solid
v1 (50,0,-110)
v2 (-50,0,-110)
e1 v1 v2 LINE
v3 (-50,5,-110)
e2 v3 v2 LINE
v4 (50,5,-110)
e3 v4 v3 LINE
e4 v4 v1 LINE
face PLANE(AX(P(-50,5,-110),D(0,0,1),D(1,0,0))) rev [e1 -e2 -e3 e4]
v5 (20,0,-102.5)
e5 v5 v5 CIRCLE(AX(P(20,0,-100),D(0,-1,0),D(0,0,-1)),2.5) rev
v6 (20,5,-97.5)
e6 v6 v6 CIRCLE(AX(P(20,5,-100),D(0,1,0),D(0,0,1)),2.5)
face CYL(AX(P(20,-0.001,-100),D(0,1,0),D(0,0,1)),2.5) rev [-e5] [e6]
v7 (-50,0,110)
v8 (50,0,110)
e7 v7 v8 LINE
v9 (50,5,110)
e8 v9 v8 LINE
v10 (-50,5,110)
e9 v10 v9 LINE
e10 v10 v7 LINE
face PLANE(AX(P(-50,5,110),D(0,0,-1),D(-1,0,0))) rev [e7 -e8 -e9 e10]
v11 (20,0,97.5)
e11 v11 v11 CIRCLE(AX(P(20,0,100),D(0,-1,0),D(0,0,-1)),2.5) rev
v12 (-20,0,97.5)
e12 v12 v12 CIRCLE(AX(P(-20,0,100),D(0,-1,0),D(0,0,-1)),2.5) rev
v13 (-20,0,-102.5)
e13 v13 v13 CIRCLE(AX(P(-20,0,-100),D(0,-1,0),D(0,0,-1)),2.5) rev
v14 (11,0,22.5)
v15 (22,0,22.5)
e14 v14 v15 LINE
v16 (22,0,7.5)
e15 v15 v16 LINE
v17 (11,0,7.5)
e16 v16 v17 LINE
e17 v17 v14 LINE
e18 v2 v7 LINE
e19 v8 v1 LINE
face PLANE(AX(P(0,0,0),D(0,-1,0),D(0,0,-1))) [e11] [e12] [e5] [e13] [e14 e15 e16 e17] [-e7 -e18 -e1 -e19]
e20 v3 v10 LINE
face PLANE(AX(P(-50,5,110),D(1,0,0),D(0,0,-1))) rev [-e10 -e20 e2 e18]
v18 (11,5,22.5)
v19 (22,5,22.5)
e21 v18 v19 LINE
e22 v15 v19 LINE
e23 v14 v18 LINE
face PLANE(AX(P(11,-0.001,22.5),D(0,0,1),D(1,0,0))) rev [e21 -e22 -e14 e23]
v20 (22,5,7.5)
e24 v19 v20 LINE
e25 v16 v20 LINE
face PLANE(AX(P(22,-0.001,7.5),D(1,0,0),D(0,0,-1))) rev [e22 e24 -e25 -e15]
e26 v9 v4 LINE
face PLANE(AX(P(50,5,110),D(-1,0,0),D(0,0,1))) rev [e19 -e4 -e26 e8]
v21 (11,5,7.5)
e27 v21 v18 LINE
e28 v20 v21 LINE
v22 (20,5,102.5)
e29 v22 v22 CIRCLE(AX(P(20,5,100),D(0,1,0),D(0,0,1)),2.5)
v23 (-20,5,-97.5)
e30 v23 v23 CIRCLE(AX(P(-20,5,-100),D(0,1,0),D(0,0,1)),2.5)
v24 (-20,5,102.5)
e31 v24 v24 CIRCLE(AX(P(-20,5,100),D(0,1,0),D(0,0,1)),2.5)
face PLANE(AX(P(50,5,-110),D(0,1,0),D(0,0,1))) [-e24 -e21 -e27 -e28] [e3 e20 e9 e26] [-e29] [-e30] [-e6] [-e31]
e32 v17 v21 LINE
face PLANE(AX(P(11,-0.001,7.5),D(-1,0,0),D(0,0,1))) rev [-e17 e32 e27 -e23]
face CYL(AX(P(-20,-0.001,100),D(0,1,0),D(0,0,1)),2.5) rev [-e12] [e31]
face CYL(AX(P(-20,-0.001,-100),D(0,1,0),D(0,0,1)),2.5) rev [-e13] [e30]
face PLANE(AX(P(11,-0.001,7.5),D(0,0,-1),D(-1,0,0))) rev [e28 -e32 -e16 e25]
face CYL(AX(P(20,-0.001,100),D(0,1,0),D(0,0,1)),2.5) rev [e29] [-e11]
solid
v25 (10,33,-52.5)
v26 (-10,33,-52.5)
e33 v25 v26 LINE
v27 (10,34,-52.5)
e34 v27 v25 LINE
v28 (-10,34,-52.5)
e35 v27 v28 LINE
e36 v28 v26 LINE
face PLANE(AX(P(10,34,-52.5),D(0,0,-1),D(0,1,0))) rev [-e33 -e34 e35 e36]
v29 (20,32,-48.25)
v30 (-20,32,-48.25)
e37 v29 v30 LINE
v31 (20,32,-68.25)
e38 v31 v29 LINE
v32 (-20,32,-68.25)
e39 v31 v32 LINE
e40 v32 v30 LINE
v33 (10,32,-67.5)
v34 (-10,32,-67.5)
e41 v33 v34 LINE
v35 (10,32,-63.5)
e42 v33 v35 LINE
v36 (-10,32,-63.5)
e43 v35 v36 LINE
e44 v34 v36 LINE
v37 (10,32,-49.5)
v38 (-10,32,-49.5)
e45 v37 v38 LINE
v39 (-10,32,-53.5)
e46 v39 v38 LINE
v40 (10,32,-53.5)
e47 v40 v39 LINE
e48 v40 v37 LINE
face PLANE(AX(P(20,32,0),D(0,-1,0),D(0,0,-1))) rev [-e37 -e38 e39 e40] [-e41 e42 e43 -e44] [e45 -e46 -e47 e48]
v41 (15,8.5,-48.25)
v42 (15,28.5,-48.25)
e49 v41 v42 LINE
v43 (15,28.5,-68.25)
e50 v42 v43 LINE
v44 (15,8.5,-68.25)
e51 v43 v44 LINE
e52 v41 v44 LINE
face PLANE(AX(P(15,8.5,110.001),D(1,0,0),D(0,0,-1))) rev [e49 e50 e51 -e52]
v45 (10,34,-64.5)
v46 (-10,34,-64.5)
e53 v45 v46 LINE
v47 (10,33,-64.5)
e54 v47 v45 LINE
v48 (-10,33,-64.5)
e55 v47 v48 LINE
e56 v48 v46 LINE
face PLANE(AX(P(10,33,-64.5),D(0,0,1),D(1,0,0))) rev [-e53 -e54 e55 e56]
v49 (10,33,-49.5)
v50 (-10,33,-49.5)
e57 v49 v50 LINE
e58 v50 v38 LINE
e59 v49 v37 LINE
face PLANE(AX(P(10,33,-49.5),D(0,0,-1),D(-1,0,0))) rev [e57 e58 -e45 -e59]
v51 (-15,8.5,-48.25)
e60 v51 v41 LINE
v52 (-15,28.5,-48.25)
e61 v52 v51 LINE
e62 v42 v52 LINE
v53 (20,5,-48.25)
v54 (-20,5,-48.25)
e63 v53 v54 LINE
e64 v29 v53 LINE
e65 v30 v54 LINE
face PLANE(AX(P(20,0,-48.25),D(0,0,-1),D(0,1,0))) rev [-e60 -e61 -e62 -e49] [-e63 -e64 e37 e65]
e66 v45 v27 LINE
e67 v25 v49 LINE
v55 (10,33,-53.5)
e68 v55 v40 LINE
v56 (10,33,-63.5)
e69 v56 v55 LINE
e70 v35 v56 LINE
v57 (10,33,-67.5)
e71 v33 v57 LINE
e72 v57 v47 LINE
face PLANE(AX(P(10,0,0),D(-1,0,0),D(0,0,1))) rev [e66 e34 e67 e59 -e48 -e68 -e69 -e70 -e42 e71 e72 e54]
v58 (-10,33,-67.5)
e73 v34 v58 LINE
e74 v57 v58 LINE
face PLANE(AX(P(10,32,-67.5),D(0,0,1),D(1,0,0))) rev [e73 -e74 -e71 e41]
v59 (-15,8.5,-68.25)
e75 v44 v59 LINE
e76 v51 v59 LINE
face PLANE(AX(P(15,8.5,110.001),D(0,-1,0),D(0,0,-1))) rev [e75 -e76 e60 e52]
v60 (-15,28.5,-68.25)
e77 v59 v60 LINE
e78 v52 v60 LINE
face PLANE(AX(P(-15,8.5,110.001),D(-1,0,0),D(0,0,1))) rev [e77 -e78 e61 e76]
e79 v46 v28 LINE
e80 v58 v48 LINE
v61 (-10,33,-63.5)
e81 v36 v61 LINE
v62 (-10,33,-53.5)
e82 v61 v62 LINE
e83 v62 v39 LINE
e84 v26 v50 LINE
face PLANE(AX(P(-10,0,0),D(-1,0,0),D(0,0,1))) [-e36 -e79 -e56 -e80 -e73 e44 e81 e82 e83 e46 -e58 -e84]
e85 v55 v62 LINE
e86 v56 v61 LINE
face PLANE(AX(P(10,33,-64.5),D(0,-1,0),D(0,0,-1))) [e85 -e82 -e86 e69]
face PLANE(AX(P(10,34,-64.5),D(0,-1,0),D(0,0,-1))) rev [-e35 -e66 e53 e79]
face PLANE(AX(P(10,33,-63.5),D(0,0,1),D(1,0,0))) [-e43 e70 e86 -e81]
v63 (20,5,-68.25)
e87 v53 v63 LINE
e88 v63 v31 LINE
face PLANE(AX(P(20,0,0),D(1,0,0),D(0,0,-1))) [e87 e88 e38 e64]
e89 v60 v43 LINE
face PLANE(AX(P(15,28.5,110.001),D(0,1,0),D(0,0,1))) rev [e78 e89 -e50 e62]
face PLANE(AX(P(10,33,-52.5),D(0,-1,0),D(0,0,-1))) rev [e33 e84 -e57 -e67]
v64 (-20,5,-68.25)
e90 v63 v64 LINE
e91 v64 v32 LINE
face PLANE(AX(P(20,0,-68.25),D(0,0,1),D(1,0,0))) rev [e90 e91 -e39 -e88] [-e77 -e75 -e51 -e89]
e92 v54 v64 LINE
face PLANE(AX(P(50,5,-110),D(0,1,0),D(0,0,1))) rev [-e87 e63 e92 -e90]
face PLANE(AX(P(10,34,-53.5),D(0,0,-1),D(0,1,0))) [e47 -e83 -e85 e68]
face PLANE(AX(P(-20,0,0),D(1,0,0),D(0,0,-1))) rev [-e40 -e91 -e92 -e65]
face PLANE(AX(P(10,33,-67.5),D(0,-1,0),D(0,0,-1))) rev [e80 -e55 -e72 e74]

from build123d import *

# Parameters (mm, degrees)
SKETCH_1_W                 = 100
SKETCH_1_H                 = 220
EXTRUDE_1_DEPTH            = 5
CUT_EXTRUDE_1_REACH        = 122.934
SKETCH_2_R                 = 2.5
CUT_EXTRUDE_2_REACH        = 122.934
SKETCH_3_W                 = 11
SKETCH_3_H                 = 15
SKETCH_5_W                 = 20
SKETCH_5_H                 = 27
EXTRUDE_2_DEPTH            = 20
EXTRUDE_START              = -10
EXTRUDE_1_2_DEPTH          = 20
CUT_EXTRUDE_3_REACH        = 190.226
SKETCH_7_W                 = 30
SKETCH_7_H                 = 20
SPLIT_START                = 5
SPLIT_BODIES_2_OUTLINE_W   = 40
SPLIT_BODIES_2_OUTLINE_H   = 20
SPLIT_BODIES_2_DEPTH       = 29
SPLIT_BODIES_2_2_OUTLINE_W = 5
SPLIT_BODIES_2_2_OUTLINE_H = 20
SPLIT_BODIES_2_2_DEPTH     = 27
SPLIT_BODIES_2_3_OUTLINE_W = 30
SPLIT_BODIES_2_3_OUTLINE_H = 20
SPLIT_BODIES_2_3_DEPTH     = 3.5
SPLIT_START_2              = 28.5
SPLIT_BODIES_2_4_OUTLINE_W = 30
SPLIT_BODIES_2_4_OUTLINE_H = 20
SPLIT_BODIES_2_4_DEPTH     = 3.5
SPLIT_START_3              = 33
SPLIT_BODIES_2_5_OUTLINE_W = 20
SPLIT_BODIES_2_5_OUTLINE_H = 12
SPLIT_BODIES_2_5_DEPTH     = 1
SPLIT_START_4              = 32
SPLIT_BODIES_2_6_OUTLINE_W = 20
SPLIT_BODIES_2_6_OUTLINE_H = 4
SPLIT_BODIES_2_6_DEPTH     = 1


# Read off the part's stored shape, not the designer's step: 拉伸-薄壁1, 分割2
with BuildPart() as part:
    # 草图1 → Extrude 1 (new body)
    with BuildSketch(Plane(origin=(0, 0, 0), x_dir=(1, 0, 0), z_dir=(0, 1, 0))):
        Rectangle(SKETCH_1_W, SKETCH_1_H)
    extrude(amount=EXTRUDE_1_DEPTH)

    # 草图2 → 切除-拉伸1 (cut, up to next)
    with BuildSketch(Plane(origin=(0, 5, 0), x_dir=(1, 0, 0), z_dir=(0, 1, 0)), mode=Mode.PRIVATE) as cut_extrude_1_sk1:
        with Locations(Location((-20, 100, 0), (0, 0, 270))):
            Circle(SKETCH_2_R)
    cut_extrude_1_tool1 = extrude(cut_extrude_1_sk1.sketch, amount=-CUT_EXTRUDE_1_REACH, mode=Mode.PRIVATE) & part.part
    # 草图2 → 切除-拉伸1 (cut, up to next)
    with BuildSketch(Plane(origin=(0, 5, 0), x_dir=(1, 0, 0), z_dir=(0, 1, 0)), mode=Mode.PRIVATE) as cut_extrude_1_sk2:
        with Locations(Location((-20, -100, 0), (0, 0, 270))):
            Circle(SKETCH_2_R)
    cut_extrude_1_tool2 = extrude(cut_extrude_1_sk2.sketch, amount=-CUT_EXTRUDE_1_REACH, mode=Mode.PRIVATE) & part.part
    # 草图2 → 切除-拉伸1 (cut, up to next)
    with BuildSketch(Plane(origin=(0, 5, 0), x_dir=(1, 0, 0), z_dir=(0, 1, 0)), mode=Mode.PRIVATE) as cut_extrude_1_sk3:
        with Locations(Location((20, 100, 0), (0, 0, 270))):
            Circle(SKETCH_2_R)
    cut_extrude_1_tool3 = extrude(cut_extrude_1_sk3.sketch, amount=-CUT_EXTRUDE_1_REACH, mode=Mode.PRIVATE) & part.part
    # 草图2 → 切除-拉伸1 (cut, up to next)
    with BuildSketch(Plane(origin=(0, 5, 0), x_dir=(1, 0, 0), z_dir=(0, 1, 0)), mode=Mode.PRIVATE) as cut_extrude_1_sk4:
        with Locations(Location((20, -100, 0), (0, 0, 270))):
            Circle(SKETCH_2_R)
    cut_extrude_1_tool4 = extrude(cut_extrude_1_sk4.sketch, amount=-CUT_EXTRUDE_1_REACH, mode=Mode.PRIVATE) & part.part
    add(cut_extrude_1_tool1.solids().sort_by_distance((-20, 5, -100))[0], mode=Mode.SUBTRACT)
    add(cut_extrude_1_tool2.solids().sort_by_distance((-20, 5, 100))[0], mode=Mode.SUBTRACT)
    add(cut_extrude_1_tool3.solids().sort_by_distance((20, 5, -100))[0], mode=Mode.SUBTRACT)
    add(cut_extrude_1_tool4.solids().sort_by_distance((20, 5, 100))[0], mode=Mode.SUBTRACT)

    # 草图3 → 切除-拉伸2 (cut, up to next)
    with BuildSketch(Plane(origin=(0, 5, 0), x_dir=(1, 0, 0), z_dir=(0, 1, 0)), mode=Mode.PRIVATE) as cut_extrude_2_sk1:
        with Locations((16.5, -15)):
            Rectangle(SKETCH_3_W, SKETCH_3_H)
    cut_extrude_2_tool1 = extrude(cut_extrude_2_sk1.sketch, amount=-CUT_EXTRUDE_2_REACH, mode=Mode.PRIVATE) & part.part
    add(cut_extrude_2_tool1.solids().sort_by_distance((16.5, 5, 15))[0], mode=Mode.SUBTRACT)

    # 草图5 → 凸台-拉伸2 (add, symmetric)
    with BuildSketch(Plane(origin=(0, 0, 0), x_dir=(0, 0, -1), z_dir=(1, 0, 0))):
        with Locations((58.25, 18.5)):
            Rectangle(SKETCH_5_W, SKETCH_5_H)
    extrude(amount=EXTRUDE_2_DEPTH, both=True)

    # Extrude 1 2 outline → Extrude 1 2 (add)
    with BuildSketch(Plane(origin=(0, 0, 0), x_dir=(0, 0, -1), z_dir=(1, 0, 0)).offset(EXTRUDE_START)):
        Polygon((49.5, 33), (49.5, 32), (53.5, 32), (53.5, 33), (63.5, 33), (63.5, 32), (67.5, 32), (67.5, 33), (64.5, 33), (64.5, 34), (52.5, 34), (52.5, 33), align=None)
    extrude(amount=EXTRUDE_1_2_DEPTH)

    # 草图7 → 切除-拉伸3 (cut, up to next)
    with BuildSketch(Plane(origin=(0, 0, -68.25), x_dir=(-1, 0, 0), z_dir=(0, 0, -1)), mode=Mode.PRIVATE) as cut_extrude_3_sk1:
        with Locations((0, 18.5)):
            Rectangle(SKETCH_7_W, SKETCH_7_H)
    cut_extrude_3_tool1 = extrude(cut_extrude_3_sk1.sketch, amount=-CUT_EXTRUDE_3_REACH, mode=Mode.PRIVATE) & part.part
    add(cut_extrude_3_tool1.solids().sort_by_distance((0, 18.5, -68.25))[0], mode=Mode.SUBTRACT)

    # Split Bodies 2 outline → Split Bodies 2 (cut)
    with BuildSketch(Plane(origin=(0, 0, 0), x_dir=(1, 0, 0), z_dir=(0, 1, 0)).offset(SPLIT_START)):
        with Locations((0, 58.25)):
            Rectangle(SPLIT_BODIES_2_OUTLINE_W, SPLIT_BODIES_2_OUTLINE_H)
    extrude(amount=SPLIT_BODIES_2_DEPTH, mode=Mode.SUBTRACT)


with BuildPart() as body_2:
    # Split Bodies 2 2 outline → Split Bodies 2 2 (new body)
    with BuildSketch(Plane(origin=(0, 0, 0), x_dir=(1, 0, 0), z_dir=(0, 1, 0)).offset(SPLIT_START)):
        with Locations((17.5, 58.25)):
            Rectangle(SPLIT_BODIES_2_2_OUTLINE_W, SPLIT_BODIES_2_2_OUTLINE_H)
        with Locations((-17.5, 58.25)):
            Rectangle(SPLIT_BODIES_2_2_OUTLINE_W, SPLIT_BODIES_2_2_OUTLINE_H)
    extrude(amount=SPLIT_BODIES_2_2_DEPTH)

    # Split Bodies 2 3 outline → Split Bodies 2 3 (add)
    with BuildSketch(Plane(origin=(0, 0, 0), x_dir=(1, 0, 0), z_dir=(0, 1, 0)).offset(SPLIT_START)):
        with Locations((0, 58.25)):
            Rectangle(SPLIT_BODIES_2_3_OUTLINE_W, SPLIT_BODIES_2_3_OUTLINE_H)
    extrude(amount=SPLIT_BODIES_2_3_DEPTH)

    # Split Bodies 2 4 outline → Split Bodies 2 4 (add)
    with BuildSketch(Plane(origin=(0, 0, 0), x_dir=(1, 0, 0), z_dir=(0, 1, 0)).offset(SPLIT_START_2)):
        with Locations((0, 58.25)):
            Rectangle(SPLIT_BODIES_2_4_OUTLINE_W, SPLIT_BODIES_2_4_OUTLINE_H)
    extrude(amount=SPLIT_BODIES_2_4_DEPTH)

    # Split Bodies 2 5 outline → Split Bodies 2 5 (add)
    with BuildSketch(Plane(origin=(0, 0, 0), x_dir=(1, 0, 0), z_dir=(0, 1, 0)).offset(SPLIT_START_3)):
        with Locations((0, 58.5)):
            Rectangle(SPLIT_BODIES_2_5_OUTLINE_W, SPLIT_BODIES_2_5_OUTLINE_H)
    extrude(amount=SPLIT_BODIES_2_5_DEPTH)

    # Split Bodies 2 6 outline → Split Bodies 2 6 (add)
    with BuildSketch(Plane(origin=(0, 0, 0), x_dir=(1, 0, 0), z_dir=(0, 1, 0)).offset(SPLIT_START_4)):
        with Locations((0, 51.5)):
            Rectangle(SPLIT_BODIES_2_6_OUTLINE_W, SPLIT_BODIES_2_6_OUTLINE_H)
        with Locations((0, 65.5)):
            Rectangle(SPLIT_BODIES_2_6_OUTLINE_W, SPLIT_BODIES_2_6_OUTLINE_H)
    extrude(amount=SPLIT_BODIES_2_6_DEPTH)


solid = Compound([part.part, body_2.part])
